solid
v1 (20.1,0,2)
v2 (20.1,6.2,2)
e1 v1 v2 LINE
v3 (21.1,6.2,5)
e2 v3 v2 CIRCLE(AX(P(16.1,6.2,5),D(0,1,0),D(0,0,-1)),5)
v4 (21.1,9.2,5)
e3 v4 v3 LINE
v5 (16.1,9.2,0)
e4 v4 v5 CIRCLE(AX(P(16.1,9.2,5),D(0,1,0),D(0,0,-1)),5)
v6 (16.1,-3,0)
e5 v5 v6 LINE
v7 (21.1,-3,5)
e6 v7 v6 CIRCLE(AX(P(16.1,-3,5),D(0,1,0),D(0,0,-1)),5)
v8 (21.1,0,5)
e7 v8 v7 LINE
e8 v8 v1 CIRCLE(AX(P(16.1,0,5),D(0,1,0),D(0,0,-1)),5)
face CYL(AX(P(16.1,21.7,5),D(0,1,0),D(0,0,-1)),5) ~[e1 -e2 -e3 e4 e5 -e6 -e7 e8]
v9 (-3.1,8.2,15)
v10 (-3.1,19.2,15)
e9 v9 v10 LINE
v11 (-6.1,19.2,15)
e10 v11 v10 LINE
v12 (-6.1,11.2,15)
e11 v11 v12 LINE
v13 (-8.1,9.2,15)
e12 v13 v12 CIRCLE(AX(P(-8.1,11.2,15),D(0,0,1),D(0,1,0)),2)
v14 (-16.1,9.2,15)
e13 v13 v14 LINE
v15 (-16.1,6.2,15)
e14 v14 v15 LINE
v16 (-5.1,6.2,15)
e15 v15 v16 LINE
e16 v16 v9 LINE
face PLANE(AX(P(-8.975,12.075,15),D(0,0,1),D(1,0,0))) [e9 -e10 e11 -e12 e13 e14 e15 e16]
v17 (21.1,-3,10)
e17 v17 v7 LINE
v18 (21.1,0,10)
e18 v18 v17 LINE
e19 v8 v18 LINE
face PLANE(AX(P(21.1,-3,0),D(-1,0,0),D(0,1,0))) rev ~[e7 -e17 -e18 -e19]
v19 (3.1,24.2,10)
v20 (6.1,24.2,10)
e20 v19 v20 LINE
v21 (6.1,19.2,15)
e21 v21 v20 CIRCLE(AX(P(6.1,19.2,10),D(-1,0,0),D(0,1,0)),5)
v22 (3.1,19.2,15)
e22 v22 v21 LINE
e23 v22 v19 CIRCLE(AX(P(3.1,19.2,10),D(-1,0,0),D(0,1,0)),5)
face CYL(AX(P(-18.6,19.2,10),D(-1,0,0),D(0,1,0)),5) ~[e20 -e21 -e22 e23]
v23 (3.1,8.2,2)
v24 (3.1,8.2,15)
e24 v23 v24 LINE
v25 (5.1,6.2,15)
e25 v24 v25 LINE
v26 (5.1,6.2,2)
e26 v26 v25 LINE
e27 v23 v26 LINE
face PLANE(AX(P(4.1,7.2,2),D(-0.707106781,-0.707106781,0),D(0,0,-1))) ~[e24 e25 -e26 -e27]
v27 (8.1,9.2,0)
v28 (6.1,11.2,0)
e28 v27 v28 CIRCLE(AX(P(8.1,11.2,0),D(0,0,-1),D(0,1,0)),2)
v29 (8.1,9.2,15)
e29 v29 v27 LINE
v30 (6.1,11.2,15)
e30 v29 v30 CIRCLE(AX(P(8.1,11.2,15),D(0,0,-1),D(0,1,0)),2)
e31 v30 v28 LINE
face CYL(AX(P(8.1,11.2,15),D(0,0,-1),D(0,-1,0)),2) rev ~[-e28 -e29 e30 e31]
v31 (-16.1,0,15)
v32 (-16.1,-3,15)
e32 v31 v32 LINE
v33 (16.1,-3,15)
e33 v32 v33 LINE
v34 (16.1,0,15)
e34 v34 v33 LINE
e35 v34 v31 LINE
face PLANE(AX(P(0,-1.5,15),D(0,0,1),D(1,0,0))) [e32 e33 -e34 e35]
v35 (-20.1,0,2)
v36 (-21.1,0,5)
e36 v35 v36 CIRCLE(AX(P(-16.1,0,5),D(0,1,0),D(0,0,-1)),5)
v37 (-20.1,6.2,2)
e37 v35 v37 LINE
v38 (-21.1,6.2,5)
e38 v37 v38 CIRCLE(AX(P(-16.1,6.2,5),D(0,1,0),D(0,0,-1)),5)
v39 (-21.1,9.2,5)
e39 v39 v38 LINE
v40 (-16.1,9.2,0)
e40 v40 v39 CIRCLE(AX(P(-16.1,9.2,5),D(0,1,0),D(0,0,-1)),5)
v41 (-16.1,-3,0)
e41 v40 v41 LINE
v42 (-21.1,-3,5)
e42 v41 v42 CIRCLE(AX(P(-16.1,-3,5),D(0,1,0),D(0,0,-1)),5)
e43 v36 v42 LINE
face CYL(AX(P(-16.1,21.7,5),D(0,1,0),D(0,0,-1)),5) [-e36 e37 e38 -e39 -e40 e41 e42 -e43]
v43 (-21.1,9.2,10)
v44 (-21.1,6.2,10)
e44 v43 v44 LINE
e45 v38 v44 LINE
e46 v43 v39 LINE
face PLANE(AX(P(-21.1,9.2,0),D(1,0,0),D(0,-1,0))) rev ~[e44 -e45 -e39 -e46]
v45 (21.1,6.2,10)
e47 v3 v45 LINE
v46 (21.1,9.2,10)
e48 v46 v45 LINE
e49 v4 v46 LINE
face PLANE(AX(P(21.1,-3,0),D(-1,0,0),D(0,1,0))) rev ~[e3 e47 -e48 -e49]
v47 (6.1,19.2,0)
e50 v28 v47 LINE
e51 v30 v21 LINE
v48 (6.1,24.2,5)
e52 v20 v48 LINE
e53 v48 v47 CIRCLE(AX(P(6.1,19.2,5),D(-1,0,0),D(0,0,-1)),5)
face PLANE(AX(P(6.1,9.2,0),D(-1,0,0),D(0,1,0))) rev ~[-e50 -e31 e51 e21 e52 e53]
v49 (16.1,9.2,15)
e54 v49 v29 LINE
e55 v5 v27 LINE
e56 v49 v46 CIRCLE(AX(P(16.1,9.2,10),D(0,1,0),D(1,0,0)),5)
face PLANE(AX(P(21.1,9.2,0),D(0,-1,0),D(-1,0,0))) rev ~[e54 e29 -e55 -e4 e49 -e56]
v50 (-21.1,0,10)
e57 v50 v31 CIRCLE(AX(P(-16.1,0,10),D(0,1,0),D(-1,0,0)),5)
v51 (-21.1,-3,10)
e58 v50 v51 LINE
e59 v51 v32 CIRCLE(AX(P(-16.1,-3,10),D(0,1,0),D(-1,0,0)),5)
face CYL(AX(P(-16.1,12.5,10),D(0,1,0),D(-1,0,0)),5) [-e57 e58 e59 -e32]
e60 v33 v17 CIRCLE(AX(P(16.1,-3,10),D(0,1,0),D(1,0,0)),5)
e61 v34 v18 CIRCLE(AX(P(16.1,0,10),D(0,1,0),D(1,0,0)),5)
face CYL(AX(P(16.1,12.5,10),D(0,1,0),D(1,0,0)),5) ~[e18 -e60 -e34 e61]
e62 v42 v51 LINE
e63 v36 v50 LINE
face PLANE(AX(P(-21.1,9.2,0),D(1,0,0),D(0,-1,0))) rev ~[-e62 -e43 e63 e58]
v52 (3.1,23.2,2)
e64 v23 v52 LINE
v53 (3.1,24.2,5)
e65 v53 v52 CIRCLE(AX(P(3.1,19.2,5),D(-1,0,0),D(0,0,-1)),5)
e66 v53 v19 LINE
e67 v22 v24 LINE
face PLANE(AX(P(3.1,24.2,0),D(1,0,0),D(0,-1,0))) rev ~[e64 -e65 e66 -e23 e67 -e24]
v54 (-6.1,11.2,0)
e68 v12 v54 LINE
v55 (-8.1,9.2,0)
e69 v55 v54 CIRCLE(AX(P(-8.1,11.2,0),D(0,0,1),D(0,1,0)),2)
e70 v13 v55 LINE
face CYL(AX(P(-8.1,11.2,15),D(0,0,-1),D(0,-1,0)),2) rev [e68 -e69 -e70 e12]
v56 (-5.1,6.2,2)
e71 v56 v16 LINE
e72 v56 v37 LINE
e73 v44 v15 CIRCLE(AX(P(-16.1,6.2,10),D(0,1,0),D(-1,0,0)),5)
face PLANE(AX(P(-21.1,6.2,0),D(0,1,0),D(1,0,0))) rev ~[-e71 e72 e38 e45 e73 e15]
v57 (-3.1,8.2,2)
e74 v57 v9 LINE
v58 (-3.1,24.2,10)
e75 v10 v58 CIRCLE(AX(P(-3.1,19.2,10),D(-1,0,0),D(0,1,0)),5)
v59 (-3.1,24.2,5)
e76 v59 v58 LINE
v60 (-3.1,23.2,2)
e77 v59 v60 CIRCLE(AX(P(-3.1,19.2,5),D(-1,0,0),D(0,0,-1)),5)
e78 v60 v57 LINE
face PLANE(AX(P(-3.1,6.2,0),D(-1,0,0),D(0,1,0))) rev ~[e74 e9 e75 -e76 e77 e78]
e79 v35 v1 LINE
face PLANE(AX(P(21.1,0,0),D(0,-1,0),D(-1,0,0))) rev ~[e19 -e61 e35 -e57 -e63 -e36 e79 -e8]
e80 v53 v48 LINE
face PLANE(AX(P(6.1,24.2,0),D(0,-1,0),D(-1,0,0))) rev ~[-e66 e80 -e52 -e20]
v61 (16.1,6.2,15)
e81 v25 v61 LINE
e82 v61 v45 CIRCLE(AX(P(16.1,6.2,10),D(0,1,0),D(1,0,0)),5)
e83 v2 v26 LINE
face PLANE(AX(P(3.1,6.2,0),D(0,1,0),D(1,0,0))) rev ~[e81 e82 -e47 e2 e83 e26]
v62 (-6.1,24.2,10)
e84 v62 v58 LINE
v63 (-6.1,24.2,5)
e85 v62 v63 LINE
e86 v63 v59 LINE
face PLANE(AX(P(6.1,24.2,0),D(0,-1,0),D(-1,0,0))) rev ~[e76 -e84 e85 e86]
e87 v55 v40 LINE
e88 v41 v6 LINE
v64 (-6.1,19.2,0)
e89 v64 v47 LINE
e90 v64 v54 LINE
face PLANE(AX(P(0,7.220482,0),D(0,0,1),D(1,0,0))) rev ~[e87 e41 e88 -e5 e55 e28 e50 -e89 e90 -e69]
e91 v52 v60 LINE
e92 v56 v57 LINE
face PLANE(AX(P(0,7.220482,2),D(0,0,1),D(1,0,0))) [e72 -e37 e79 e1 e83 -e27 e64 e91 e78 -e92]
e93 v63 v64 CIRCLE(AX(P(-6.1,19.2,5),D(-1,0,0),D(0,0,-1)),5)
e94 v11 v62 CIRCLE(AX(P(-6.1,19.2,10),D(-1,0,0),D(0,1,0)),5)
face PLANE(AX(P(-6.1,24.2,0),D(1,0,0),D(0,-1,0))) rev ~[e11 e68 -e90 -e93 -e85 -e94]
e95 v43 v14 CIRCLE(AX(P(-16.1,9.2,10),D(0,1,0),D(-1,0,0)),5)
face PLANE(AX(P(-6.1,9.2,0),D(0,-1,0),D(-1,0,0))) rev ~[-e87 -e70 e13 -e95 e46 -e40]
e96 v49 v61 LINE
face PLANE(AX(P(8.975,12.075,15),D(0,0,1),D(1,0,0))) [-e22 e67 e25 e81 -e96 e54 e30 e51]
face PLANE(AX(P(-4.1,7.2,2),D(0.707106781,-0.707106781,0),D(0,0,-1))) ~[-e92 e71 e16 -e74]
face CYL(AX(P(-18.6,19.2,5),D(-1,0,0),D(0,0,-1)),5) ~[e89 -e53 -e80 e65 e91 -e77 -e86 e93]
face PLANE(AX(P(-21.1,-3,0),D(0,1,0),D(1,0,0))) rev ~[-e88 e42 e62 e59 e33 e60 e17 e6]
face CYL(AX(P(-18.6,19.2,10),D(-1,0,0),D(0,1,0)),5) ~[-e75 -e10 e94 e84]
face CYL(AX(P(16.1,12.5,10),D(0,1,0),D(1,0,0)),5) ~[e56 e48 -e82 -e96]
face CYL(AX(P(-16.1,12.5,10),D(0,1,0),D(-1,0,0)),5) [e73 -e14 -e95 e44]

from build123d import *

# Parameters (mm, degrees)
F1_DEPTH     = 2
F2_DEPTH     = 15
F3_R         = 2
F4_T1_DEPTH  = 28
F4_T3_DEPTH  = 28
F4_T5_DEPTH  = 28
F4_T7_DEPTH  = 28
F4_T9_DEPTH  = 37.2
F4_T11_DEPTH = 37.2
F5_R         = 2
F6_SIZE      = 2


# Not quite as in the source:
# - a fillet or chamfer that OpenCascade refuses, or shapes differently, is made with other operations: its cross-section is extruded or revolved along the edge and cut away or added


with BuildPart() as f1:
    # F0 (on Top) → F1 (new body)
    with BuildSketch(Plane.XY):
        Polygon((-21.1, 0), (0, 0), (21.1, 0), (21.1, 6.2), (3.1, 6.2), (3.1, 24.2), (-3.1, 24.2), (-3.1, 6.2), (-21.1, 6.2), align=None)
        Polygon((21.1, 0), (0, 0), (-21.1, 0), (-21.1, -3), (0, -3), (21.1, -3), align=None)
        Polygon((3.1, 6.2), (21.1, 6.2), (21.1, 9.2), (6.1, 9.2), (6.1, 24.2), (3.1, 24.2), align=None)
        Polygon((-21.1, 9.2), (-21.1, 6.2), (-3.1, 6.2), (-3.1, 24.2), (-6.1, 24.2), (-6.1, 9.2), align=None)
    extrude(amount=F1_DEPTH)

    # F0 (on Top) → F2 (join)
    with BuildSketch(Plane.XY):
        Polygon((-21.1, 9.2), (-21.1, 6.2), (-3.1, 6.2), (-3.1, 24.2), (-6.1, 24.2), (-6.1, 9.2), align=None)
        Polygon((3.1, 6.2), (21.1, 6.2), (21.1, 9.2), (6.1, 9.2), (6.1, 24.2), (3.1, 24.2), align=None)
        Polygon((21.1, 0), (0, 0), (-21.1, 0), (-21.1, -3), (0, -3), (21.1, -3), align=None)
    extrude(amount=F2_DEPTH)

    # F3
    f3_edges = [f1.edges().sort_by_distance(p)[0] for p in [
        (6.1, 9.2, 7.5),
    ]]
    fillet(f3_edges, radius=F3_R)

    # F4: fillet of radius 5 on 9 edges, made by hand

    # F4_s2 → F4_t1 (cut)
    with BuildSketch(Plane.XZ.offset(-12.5)):
        with BuildLine():
            ThreePointArc((21.1, 10), (19.6355339059, 13.5355339059), (16.1, 15))
            Line((16.1, 15), (21.1, 15))
            Line((21.1, 15), (21.1, 10))
        make_face()
        with BuildLine():
            ThreePointArc((-21.1, 10), (-19.6355339059, 13.5355339059), (-16.1, 15))
            Line((-16.1, 15), (-21.1, 15))
            Line((-21.1, 15), (-21.1, 10))
        make_face()
    extrude(amount=F4_T1_DEPTH, mode=Mode.SUBTRACT)

    # F4_s4 → F4_t3 (cut)
    with BuildSketch(Plane.XZ.offset(-21.7)):
        with BuildLine():
            ThreePointArc((21.1, 10), (19.6355339059, 13.5355339059), (16.1, 15))
            Line((16.1, 15), (21.1, 15))
            Line((21.1, 15), (21.1, 10))
        make_face()
        with BuildLine():
            ThreePointArc((-21.1, 10), (-19.6355339059, 13.5355339059), (-16.1, 15))
            Line((-16.1, 15), (-21.1, 15))
            Line((-21.1, 15), (-21.1, 10))
        make_face()
    extrude(amount=F4_T3_DEPTH, mode=Mode.SUBTRACT)

    # F4_s6 → F4_t5 (cut)
    with BuildSketch(Plane.YZ.offset(-18.6)):
        with BuildLine():
            ThreePointArc((24.2, 10), (22.7355339059, 13.5355339059), (19.2, 15))
            Line((19.2, 15), (24.2, 15))
            Line((24.2, 15), (24.2, 10))
        make_face()
    extrude(amount=F4_T5_DEPTH, mode=Mode.SUBTRACT)

    # F4_s8 → F4_t7 (cut)
    with BuildSketch(Plane.YZ.offset(-9.4)):
        with BuildLine():
            ThreePointArc((24.2, 10), (22.7355339059, 13.5355339059), (19.2, 15))
            Line((19.2, 15), (24.2, 15))
            Line((24.2, 15), (24.2, 10))
        make_face()
    extrude(amount=F4_T7_DEPTH, mode=Mode.SUBTRACT)

    # F4_s10 → F4_t9 (cut)
    with BuildSketch(Plane.XZ.offset(-21.7)):
        with BuildLine():
            ThreePointArc((-16.1, 0), (-19.6355339059, 1.4644660941), (-21.1, 5))
            Line((-21.1, 5), (-21.1, 0))
            Line((-21.1, 0), (-16.1, 0))
        make_face()
        with BuildLine():
            ThreePointArc((16.1, 0), (19.6355339059, 1.4644660941), (21.1, 5))
            Line((21.1, 5), (21.1, 0))
            Line((21.1, 0), (16.1, 0))
        make_face()
    extrude(amount=F4_T9_DEPTH, mode=Mode.SUBTRACT)

    # F4_s12 → F4_t11 (cut)
    with BuildSketch(Plane.YZ.offset(-18.6)):
        with BuildLine():
            ThreePointArc((19.2, 0), (22.7355339059, 1.4644660941), (24.2, 5))
            Line((24.2, 5), (24.2, 0))
            Line((24.2, 0), (19.2, 0))
        make_face()
    extrude(amount=F4_T11_DEPTH, mode=Mode.SUBTRACT)

    # F5
    f5_edges = [f1.edges().sort_by_distance(p)[0] for p in [
        (-6.1, 9.2, 7.5),
    ]]
    fillet(f5_edges, radius=F5_R)

    # F6
    f6_edges = [f1.edges().sort_by_distance(p)[0] for p in [
        (3.1, 6.2, 8.5),
        (-3.1, 6.2, 8.5),
    ]]
    chamfer(f6_edges, length=F6_SIZE)


solid = f1.part
